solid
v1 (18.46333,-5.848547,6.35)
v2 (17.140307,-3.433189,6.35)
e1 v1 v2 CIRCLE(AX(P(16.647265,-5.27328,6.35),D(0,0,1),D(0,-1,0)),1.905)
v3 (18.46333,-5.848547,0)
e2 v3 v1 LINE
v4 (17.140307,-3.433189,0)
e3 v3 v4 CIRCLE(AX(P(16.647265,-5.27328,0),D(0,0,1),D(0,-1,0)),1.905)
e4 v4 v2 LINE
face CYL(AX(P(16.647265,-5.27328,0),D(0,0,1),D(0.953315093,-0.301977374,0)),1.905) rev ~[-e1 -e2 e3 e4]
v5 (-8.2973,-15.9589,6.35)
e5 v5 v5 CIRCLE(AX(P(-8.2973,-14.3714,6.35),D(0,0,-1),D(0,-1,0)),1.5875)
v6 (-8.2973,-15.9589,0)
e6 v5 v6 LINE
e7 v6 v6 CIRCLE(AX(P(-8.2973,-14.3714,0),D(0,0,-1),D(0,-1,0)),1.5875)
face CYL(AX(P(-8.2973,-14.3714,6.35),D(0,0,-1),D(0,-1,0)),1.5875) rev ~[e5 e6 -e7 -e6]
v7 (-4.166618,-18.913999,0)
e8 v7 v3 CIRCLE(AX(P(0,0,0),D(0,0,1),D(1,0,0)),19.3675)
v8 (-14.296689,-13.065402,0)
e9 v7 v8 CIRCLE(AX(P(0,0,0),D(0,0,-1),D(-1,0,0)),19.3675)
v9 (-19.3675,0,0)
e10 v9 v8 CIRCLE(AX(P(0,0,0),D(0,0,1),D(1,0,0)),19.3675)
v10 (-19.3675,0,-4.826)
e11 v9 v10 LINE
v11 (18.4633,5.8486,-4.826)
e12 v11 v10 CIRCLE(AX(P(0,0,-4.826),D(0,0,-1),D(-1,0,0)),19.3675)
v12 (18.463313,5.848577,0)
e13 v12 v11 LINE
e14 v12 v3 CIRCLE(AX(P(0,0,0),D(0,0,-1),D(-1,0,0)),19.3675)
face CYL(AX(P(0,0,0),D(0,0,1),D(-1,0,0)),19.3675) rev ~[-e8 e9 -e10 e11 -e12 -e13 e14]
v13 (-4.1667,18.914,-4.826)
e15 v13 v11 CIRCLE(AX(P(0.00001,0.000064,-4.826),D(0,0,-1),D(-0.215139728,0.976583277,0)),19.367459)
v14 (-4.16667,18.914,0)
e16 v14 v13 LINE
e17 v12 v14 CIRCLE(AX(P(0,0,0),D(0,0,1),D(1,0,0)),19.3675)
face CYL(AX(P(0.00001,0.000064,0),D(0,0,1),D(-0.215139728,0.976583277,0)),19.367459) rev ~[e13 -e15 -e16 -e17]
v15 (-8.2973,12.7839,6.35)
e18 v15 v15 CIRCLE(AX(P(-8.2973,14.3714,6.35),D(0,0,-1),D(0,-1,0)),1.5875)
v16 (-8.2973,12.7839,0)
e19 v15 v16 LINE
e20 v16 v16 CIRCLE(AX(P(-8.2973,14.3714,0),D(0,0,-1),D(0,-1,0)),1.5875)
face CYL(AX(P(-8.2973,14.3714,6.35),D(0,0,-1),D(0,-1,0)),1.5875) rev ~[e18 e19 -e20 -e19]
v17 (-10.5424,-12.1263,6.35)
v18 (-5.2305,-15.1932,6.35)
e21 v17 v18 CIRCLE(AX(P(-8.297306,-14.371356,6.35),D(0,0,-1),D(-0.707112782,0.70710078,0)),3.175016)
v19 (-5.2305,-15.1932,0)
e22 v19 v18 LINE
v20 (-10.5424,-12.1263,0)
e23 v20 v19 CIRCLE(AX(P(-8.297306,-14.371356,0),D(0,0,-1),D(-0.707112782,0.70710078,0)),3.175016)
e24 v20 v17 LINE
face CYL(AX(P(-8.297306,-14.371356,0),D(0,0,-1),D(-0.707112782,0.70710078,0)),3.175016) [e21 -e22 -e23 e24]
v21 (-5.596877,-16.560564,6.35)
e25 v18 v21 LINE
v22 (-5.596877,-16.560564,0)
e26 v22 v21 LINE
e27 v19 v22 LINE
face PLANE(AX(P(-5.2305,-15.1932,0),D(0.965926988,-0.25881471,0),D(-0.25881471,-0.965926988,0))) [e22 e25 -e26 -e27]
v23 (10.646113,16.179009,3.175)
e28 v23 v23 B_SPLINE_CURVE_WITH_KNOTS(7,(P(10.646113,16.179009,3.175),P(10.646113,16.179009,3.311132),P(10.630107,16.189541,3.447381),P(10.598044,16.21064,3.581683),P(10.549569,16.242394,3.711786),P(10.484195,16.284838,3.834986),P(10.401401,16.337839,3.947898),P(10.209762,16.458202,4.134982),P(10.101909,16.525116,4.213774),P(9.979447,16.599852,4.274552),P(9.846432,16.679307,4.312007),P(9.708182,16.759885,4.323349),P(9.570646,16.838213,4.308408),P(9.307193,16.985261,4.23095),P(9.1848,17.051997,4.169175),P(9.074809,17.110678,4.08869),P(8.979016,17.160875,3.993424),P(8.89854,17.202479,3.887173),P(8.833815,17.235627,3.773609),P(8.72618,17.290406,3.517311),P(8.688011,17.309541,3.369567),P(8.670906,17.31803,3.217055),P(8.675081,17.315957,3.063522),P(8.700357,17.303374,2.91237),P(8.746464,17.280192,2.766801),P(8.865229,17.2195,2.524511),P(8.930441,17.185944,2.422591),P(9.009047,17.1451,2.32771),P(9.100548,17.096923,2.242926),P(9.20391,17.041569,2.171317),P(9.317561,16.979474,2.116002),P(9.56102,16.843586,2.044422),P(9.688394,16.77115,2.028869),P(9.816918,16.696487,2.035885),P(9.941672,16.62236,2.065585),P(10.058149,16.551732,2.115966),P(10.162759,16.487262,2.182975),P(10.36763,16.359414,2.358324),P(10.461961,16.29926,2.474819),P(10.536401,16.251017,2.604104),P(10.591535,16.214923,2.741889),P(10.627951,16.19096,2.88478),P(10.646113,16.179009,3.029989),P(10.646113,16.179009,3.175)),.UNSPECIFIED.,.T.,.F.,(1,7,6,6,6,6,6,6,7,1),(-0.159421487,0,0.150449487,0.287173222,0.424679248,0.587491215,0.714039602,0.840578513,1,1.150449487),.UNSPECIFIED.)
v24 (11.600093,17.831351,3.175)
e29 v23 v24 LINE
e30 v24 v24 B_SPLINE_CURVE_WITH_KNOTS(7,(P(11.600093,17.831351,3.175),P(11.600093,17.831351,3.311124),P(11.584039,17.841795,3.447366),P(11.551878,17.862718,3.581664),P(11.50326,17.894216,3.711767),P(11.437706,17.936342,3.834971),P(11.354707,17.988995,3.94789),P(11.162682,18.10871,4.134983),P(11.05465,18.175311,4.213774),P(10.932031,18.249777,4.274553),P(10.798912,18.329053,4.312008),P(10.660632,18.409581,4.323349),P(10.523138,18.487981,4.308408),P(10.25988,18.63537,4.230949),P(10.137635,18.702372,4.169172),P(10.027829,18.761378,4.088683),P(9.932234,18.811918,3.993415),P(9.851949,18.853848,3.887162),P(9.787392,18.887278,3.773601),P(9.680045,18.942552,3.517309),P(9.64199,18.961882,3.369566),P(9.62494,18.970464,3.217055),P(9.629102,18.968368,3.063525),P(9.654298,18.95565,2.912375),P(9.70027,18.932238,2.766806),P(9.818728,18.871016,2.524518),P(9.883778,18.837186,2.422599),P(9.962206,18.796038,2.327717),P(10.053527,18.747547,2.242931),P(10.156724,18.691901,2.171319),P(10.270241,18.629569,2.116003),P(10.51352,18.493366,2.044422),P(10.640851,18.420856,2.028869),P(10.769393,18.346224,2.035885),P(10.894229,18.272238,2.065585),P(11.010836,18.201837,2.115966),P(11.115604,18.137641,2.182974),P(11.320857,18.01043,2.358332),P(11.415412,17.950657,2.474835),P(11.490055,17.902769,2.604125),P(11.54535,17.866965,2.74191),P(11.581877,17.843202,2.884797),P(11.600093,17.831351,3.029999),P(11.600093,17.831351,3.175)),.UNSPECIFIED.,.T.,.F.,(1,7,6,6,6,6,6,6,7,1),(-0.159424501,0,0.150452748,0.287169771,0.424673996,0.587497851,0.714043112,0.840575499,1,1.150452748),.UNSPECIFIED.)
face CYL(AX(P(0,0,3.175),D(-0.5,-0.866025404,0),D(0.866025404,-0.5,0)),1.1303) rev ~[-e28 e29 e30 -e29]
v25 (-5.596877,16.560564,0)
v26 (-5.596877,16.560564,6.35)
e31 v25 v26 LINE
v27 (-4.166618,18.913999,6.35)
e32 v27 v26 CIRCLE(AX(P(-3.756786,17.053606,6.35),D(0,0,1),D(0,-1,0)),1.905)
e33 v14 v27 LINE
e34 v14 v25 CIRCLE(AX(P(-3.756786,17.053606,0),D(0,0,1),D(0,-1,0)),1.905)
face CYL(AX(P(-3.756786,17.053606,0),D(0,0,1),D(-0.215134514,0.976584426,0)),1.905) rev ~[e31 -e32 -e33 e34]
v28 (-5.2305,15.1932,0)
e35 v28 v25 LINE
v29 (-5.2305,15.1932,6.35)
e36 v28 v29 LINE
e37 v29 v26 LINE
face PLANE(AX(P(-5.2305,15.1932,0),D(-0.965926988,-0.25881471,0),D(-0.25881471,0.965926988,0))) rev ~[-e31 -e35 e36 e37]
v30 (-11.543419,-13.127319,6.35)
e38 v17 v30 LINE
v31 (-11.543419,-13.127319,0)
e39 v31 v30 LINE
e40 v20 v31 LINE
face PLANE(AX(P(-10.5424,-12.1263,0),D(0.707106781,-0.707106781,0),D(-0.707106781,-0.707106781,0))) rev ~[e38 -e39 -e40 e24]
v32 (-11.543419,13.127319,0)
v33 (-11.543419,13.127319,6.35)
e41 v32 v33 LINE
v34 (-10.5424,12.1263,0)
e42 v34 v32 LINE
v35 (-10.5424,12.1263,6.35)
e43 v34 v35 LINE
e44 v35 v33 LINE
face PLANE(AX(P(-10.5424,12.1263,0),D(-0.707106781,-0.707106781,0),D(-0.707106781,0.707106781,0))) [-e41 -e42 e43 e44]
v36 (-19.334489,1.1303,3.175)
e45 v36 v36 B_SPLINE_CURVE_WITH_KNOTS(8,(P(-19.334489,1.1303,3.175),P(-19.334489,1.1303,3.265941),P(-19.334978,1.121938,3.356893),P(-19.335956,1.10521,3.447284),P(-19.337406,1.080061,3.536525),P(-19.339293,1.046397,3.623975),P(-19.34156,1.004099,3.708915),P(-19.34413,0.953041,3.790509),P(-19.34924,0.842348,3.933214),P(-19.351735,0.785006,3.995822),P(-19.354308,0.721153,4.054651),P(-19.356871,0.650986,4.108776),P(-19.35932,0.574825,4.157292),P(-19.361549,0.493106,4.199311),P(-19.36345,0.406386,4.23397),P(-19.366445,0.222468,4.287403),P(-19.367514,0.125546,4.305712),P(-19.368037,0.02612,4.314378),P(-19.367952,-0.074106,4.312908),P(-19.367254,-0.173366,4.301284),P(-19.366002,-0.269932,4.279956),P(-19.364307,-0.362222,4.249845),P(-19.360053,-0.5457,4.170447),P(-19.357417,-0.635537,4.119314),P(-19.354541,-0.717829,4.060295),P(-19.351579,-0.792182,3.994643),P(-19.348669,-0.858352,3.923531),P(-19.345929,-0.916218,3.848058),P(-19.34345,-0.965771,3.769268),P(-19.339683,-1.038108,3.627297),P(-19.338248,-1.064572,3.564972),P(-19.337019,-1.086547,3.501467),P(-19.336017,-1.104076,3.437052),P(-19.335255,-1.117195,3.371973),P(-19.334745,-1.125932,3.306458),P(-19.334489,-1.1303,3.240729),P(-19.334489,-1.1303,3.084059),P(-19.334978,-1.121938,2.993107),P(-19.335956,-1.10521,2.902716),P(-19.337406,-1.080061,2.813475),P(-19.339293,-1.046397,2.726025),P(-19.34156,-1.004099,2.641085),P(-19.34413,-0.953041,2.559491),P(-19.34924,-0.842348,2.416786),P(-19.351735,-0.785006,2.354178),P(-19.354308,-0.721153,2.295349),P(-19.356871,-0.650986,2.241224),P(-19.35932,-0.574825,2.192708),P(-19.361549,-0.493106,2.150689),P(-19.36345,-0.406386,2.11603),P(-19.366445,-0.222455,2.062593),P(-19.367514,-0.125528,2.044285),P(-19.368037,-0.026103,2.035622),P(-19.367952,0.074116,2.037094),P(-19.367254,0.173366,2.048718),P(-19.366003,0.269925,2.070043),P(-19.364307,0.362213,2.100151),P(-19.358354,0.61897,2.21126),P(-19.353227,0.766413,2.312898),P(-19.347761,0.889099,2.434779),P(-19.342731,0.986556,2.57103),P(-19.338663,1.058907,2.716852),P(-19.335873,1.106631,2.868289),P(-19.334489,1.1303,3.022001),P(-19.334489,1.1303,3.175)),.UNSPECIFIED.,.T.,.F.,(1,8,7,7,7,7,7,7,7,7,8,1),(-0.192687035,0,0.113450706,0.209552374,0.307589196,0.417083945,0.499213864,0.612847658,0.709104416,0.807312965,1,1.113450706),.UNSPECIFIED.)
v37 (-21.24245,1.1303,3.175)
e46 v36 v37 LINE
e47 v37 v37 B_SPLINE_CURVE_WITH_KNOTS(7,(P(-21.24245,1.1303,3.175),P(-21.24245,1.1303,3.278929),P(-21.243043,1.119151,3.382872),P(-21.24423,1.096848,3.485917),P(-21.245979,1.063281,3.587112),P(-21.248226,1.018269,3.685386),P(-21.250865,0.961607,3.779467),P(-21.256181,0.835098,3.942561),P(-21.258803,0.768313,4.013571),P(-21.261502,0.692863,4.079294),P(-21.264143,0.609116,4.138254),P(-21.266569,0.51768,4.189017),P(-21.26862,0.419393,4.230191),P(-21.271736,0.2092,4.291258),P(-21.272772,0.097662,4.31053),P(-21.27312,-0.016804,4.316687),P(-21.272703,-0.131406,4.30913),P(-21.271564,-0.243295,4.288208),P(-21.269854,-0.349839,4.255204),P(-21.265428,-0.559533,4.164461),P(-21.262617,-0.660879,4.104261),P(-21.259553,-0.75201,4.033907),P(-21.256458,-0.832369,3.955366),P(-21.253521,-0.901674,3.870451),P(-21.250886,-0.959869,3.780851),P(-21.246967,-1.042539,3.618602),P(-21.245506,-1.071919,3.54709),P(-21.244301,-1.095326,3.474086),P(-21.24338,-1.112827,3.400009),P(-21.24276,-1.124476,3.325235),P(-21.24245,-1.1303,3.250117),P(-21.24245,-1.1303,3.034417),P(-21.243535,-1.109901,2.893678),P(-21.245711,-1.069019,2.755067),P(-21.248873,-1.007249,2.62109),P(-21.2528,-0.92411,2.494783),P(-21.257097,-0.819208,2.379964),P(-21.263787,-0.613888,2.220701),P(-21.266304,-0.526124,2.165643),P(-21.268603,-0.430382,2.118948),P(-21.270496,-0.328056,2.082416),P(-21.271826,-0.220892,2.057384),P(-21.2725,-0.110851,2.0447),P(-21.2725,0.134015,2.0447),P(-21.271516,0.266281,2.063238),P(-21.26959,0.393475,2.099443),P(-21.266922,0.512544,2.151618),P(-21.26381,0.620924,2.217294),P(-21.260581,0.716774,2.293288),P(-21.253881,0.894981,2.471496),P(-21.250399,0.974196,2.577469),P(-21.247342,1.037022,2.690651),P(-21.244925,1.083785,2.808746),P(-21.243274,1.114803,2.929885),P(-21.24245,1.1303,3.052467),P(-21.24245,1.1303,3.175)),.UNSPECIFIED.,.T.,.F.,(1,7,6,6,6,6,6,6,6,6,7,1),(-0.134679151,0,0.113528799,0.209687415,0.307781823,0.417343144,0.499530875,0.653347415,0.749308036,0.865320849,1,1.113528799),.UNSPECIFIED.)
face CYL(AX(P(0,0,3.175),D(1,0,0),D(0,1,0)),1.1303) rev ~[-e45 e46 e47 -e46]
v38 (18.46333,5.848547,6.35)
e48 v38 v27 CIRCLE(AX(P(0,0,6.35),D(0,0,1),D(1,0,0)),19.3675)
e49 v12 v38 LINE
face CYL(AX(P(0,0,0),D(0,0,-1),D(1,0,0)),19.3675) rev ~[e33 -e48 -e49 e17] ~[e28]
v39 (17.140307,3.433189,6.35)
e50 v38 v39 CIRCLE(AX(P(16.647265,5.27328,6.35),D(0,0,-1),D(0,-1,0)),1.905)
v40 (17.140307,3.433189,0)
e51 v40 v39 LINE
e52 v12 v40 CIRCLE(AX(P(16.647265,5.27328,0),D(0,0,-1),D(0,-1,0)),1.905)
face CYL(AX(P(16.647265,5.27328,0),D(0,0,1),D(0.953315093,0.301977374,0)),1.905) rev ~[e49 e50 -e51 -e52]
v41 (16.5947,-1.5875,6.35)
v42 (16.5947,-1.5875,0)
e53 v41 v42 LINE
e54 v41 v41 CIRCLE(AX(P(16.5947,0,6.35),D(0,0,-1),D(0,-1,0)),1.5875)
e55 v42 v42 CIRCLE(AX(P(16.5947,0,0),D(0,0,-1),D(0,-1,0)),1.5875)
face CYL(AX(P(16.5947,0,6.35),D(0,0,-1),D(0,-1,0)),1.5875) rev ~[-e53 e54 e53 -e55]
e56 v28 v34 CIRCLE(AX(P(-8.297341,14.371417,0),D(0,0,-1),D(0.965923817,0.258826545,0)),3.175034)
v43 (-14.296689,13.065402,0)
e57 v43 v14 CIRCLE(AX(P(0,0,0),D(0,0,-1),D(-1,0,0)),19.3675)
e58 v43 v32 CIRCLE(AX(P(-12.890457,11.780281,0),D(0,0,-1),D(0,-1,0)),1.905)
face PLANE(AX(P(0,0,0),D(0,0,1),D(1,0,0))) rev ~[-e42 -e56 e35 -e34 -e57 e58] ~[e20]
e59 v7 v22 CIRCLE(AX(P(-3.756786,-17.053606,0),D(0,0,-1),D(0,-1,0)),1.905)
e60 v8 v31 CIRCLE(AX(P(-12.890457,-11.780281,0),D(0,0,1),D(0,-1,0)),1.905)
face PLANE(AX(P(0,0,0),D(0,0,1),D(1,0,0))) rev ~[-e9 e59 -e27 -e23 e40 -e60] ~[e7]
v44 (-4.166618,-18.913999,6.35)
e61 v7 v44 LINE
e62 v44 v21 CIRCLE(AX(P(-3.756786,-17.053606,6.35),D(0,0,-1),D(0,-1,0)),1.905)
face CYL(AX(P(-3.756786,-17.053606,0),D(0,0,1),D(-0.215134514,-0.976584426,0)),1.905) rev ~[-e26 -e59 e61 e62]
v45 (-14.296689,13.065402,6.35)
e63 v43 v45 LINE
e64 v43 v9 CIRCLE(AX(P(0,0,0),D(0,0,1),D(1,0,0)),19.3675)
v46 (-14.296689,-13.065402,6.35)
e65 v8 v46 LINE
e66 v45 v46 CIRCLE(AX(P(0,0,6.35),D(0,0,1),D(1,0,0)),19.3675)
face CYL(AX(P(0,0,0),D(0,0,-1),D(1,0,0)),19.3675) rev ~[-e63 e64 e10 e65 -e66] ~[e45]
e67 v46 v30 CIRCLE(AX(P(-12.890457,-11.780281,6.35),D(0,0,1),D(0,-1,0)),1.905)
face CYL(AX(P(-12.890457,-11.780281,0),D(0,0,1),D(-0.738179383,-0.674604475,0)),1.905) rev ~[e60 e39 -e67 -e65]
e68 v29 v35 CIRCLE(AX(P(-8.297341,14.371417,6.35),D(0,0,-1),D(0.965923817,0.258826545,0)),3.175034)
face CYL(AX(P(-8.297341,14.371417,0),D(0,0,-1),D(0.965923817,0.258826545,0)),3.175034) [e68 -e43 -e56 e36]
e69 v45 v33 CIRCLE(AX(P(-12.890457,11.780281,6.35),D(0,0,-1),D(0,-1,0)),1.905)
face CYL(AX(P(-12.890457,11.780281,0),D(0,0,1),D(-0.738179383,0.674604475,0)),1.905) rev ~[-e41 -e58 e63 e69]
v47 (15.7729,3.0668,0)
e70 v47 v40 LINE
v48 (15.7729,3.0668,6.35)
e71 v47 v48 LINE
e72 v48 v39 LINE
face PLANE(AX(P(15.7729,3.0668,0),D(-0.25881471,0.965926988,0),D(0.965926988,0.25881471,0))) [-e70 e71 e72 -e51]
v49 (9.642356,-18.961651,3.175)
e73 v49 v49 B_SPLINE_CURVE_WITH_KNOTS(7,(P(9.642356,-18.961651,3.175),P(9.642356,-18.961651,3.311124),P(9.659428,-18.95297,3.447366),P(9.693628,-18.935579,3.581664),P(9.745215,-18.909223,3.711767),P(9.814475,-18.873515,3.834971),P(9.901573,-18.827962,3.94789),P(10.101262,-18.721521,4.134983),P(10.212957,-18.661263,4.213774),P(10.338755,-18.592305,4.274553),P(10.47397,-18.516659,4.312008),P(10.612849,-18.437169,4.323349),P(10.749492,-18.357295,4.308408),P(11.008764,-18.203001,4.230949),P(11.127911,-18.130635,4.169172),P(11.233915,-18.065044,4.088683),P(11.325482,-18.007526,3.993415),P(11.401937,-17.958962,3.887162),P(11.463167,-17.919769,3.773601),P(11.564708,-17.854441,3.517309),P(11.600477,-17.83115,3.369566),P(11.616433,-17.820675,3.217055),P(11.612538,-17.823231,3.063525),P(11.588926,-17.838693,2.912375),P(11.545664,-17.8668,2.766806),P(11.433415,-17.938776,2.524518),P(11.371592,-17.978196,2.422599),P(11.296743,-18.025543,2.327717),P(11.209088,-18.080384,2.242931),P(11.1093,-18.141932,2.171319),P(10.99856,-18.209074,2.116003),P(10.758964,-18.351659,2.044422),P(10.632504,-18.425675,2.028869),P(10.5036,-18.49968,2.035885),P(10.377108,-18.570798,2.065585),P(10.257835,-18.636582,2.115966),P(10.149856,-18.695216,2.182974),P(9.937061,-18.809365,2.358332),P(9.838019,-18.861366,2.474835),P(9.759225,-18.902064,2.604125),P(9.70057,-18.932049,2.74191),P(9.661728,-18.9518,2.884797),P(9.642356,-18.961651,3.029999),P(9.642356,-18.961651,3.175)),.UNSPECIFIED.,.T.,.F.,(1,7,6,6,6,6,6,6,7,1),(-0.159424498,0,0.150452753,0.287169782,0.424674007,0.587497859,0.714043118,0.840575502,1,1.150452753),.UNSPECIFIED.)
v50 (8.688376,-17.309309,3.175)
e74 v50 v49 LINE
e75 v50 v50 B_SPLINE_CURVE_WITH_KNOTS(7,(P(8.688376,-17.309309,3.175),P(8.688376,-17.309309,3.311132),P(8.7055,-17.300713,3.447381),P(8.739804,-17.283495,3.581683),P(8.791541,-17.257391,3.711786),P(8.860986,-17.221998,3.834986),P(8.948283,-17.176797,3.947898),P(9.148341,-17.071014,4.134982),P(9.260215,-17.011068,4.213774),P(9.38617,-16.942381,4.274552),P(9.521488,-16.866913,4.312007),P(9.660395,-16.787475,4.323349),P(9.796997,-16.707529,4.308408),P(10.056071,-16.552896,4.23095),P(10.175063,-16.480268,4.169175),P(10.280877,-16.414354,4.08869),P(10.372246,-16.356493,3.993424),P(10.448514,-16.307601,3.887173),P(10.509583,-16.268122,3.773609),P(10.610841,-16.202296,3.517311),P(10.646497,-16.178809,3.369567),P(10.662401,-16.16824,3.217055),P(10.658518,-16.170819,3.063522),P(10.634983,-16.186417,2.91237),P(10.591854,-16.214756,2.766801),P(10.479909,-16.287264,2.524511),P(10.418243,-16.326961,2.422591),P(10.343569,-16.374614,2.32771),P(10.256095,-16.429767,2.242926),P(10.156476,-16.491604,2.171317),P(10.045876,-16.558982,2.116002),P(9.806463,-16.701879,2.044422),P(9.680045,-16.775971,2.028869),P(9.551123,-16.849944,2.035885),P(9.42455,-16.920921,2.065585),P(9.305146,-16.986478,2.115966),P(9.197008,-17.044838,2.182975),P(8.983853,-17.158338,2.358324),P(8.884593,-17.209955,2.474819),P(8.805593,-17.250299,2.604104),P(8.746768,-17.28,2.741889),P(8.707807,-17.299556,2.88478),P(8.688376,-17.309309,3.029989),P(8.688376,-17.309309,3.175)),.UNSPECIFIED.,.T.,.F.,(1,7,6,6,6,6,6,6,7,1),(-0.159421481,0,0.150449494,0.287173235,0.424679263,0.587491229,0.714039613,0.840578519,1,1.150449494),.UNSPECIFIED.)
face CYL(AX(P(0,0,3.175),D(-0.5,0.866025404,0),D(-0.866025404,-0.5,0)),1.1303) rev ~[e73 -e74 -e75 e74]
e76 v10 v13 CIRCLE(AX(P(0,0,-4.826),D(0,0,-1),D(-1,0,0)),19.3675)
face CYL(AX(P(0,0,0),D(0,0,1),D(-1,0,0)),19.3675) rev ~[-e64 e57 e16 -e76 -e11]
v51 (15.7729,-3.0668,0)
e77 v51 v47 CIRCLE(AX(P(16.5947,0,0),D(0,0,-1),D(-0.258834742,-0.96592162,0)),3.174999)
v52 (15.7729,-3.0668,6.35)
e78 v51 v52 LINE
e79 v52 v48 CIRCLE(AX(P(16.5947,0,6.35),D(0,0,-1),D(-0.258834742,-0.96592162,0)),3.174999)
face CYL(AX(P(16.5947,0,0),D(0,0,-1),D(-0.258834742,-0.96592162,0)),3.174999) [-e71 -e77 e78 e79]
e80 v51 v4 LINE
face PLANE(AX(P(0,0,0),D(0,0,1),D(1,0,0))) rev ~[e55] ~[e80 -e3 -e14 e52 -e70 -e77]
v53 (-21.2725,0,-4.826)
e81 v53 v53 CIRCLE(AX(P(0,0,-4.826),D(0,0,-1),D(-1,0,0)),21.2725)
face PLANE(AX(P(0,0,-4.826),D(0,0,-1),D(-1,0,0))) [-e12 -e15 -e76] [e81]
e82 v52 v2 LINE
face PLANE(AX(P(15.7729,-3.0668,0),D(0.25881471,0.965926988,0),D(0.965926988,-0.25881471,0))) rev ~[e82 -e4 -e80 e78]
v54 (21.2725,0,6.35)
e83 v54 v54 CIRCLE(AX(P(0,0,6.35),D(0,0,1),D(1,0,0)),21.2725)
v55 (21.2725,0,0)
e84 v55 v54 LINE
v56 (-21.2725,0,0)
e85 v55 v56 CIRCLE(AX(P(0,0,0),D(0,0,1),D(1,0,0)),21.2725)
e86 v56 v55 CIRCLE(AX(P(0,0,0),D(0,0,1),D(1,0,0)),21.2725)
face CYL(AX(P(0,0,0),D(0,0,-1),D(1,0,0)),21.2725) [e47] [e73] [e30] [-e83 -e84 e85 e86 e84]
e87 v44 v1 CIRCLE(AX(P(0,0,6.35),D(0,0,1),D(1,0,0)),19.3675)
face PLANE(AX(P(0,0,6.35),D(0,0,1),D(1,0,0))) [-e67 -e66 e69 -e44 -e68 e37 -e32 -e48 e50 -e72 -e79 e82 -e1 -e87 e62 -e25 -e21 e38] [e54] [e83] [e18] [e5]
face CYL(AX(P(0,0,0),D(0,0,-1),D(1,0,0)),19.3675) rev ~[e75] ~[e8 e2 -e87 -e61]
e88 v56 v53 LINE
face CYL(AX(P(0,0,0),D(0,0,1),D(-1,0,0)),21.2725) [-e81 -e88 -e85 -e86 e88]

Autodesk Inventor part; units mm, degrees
ref_plane "YZ Plane" through (0, 0, 0) normal (1, 0, 0) x (0, 1, 0)
ref_plane "XZ Plane" through (0, 0, 0) normal (0, 1, 0) x (-1, 0, 0)
ref_plane "XY Plane" through (0, 0, 0) normal (0, 0, 1) x (1, 0, 0)
sketch "Sketch1" plane through (0, 0, 0) normal (0, 0, 1) x (1, 0, 0)
  circle A0 centre (0, 0) radius 19.3675
  circle A1 centre (0, 0) radius 21.2725
  dimension "d0" = 38.735
  dimension "d1" = 42.545
extrude "Extrusion1" add sketch "Sketch1" along normal blind 6.35
sketch "Sketch2" plane through (0, 0, 0) normal (0, 0, -1) x (-1, 0, 0)
  line L0 (-16.5947, 0) -> (8.2973, 14.3714) construction
  line L1 (8.2973, 14.3714) -> (8.2973, -14.3714) construction
  line L2 (8.2973, -14.3714) -> (-16.5947, 0) construction
  arc A0 (-15.7729, -3.0668) -> (-15.7729, 3.0668) centre (-16.5947, 0) ccw
  circle A1 centre (0, 0) radius 19.3675 construction
  arc A2 (-18.9661, 3.9224) -> (-18.9661, -3.9224) centre (0, 0) ccw
  line L3 (-15.7729, -3.0668) -> (-18.9661, -3.9224)
  line L4 (-15.7729, 3.0668) -> (-18.9661, 3.9224)
  line L5 (0, 0) -> (-17.8049, 0) construction
  arc A3 (10.5424, -12.1263) -> (5.2305, -15.1932) centre (8.2973, -14.3714) ccw
  arc A4 (6.0861, -18.3864) -> (12.88, -14.4639) centre (0, 0) ccw
  line L6 (10.5424, -12.1263) -> (12.88, -14.4639)
  line L7 (5.2305, -15.1932) -> (6.0861, -18.3864)
  arc A5 (5.2305, 15.1932) -> (10.5424, 12.1263) centre (8.2973, 14.3714) ccw
  arc A6 (12.88, 14.4639) -> (6.0861, 18.3864) centre (0, 0) ccw
  line L8 (5.2305, 15.1932) -> (6.0861, 18.3864)
  line L9 (10.5424, 12.1263) -> (12.88, 14.4639)
  line L10 (0, 0) -> (-13.4197, 0) construction
  circle A7 centre (0, 0) radius 19.05 construction
  line L11 (19.05, -19.05) -> (-19.05, -19.05) construction
  line L12 (-19.05, -19.05) -> (-19.05, 19.05) construction
  line L13 (-19.05, 19.05) -> (19.05, 19.05) construction
  line L14 (19.05, 19.05) -> (19.05, -19.05) construction
  line L15 (19.05, -19.05) -> (-19.05, 19.05) construction
  line L16 (-19.05, -19.05) -> (19.05, 19.05) construction
  point P0 (8.9024, -15.4195)
  point P1 (8.9024, 15.4195)
  point P2 (0, 19.05)
  dimension "d62" = 38.1
  dimension "d5" = 6.35
  dimension "d7" = 30
  dimension "d10" = 360
  dimension "d59" = 13.4197
  dimension "d63" = 38.1
  dimension "d65" = 24.892
extrude "Extrusion2" add sketch "Sketch2" against normal up to surface (6.35 mm away)
fillet "Fillet1" radius 1.905 6 edges at (-6.0861, 18.3864, 3.175) (-12.88, 14.4639, 3.175) (18.9661, -3.9224, 3.175) (18.9661, 3.9224, 3.175) (-12.88, -14.4639, 3.175) (-6.0861, -18.3864, 3.175)
sketch "Sketch3" plane through (0, 0, 6.35) normal (0, 0, 1) x (1, 0, 0)
  arc A0 (-10.5424, 12.1263) -> (-5.2305, 15.1932) centre (-8.2973, 14.3714) ccw construction
  arc A1 (-5.2305, -15.1932) -> (-10.5424, -12.1263) centre (-8.2973, -14.3714) ccw construction
  arc A2 (15.7729, 3.0668) -> (15.7729, -3.0668) centre (16.5947, 0) ccw construction
  point P0 (0, 0)
hole "Hole1" at (-8.2973, 14.3714, 6.35) at (16.5947, 0, 6.35) at (-8.2973, -14.3714, 6.35) direction (0, 0, -1) diameter 3.175 end through all
sketch "Sketch11" plane through (0, 0, 0) normal (1, 0, 0) x (0, 1, 0)
  circle A0 centre (0, 3.175) radius 1.1303
  line L0 (13.0654, 0) -> (-13.0654, 0) projected
  line L1 (-13.0654, 6.35) -> (13.0654, 6.35) projected
  point P0 (0, 0)
  point P1 (0, 0)
  dimension "d51" = 2.2606
  dimension "d52" = 3.175
  dimension "d53" = 6.35
extrude "Extrusion7" cut sketch "Sketch11" against normal through all
pattern_circular "Circular Pattern1" count 3 over 360 about axis through (0, 0, 0) along (0, 0, 1) of "Extrusion7"
sketch "Sketch12" plane through (0, 0, 0) normal (0, 0, -1) x (-1, 0, 0)
  arc A0 (4.1667, 18.914) -> (-18.4633, 5.8486) centre (0, 0) ccw projected
  circle A1 centre (0, 0) radius 19.3675
  circle A2 centre (0, 0) radius 21.2725
extrude "Extrusion8" add sketch "Sketch12" along normal blind 4.826
equation "\"d52\" = 0.5 * d53"
properties part number "Board Spacer"
